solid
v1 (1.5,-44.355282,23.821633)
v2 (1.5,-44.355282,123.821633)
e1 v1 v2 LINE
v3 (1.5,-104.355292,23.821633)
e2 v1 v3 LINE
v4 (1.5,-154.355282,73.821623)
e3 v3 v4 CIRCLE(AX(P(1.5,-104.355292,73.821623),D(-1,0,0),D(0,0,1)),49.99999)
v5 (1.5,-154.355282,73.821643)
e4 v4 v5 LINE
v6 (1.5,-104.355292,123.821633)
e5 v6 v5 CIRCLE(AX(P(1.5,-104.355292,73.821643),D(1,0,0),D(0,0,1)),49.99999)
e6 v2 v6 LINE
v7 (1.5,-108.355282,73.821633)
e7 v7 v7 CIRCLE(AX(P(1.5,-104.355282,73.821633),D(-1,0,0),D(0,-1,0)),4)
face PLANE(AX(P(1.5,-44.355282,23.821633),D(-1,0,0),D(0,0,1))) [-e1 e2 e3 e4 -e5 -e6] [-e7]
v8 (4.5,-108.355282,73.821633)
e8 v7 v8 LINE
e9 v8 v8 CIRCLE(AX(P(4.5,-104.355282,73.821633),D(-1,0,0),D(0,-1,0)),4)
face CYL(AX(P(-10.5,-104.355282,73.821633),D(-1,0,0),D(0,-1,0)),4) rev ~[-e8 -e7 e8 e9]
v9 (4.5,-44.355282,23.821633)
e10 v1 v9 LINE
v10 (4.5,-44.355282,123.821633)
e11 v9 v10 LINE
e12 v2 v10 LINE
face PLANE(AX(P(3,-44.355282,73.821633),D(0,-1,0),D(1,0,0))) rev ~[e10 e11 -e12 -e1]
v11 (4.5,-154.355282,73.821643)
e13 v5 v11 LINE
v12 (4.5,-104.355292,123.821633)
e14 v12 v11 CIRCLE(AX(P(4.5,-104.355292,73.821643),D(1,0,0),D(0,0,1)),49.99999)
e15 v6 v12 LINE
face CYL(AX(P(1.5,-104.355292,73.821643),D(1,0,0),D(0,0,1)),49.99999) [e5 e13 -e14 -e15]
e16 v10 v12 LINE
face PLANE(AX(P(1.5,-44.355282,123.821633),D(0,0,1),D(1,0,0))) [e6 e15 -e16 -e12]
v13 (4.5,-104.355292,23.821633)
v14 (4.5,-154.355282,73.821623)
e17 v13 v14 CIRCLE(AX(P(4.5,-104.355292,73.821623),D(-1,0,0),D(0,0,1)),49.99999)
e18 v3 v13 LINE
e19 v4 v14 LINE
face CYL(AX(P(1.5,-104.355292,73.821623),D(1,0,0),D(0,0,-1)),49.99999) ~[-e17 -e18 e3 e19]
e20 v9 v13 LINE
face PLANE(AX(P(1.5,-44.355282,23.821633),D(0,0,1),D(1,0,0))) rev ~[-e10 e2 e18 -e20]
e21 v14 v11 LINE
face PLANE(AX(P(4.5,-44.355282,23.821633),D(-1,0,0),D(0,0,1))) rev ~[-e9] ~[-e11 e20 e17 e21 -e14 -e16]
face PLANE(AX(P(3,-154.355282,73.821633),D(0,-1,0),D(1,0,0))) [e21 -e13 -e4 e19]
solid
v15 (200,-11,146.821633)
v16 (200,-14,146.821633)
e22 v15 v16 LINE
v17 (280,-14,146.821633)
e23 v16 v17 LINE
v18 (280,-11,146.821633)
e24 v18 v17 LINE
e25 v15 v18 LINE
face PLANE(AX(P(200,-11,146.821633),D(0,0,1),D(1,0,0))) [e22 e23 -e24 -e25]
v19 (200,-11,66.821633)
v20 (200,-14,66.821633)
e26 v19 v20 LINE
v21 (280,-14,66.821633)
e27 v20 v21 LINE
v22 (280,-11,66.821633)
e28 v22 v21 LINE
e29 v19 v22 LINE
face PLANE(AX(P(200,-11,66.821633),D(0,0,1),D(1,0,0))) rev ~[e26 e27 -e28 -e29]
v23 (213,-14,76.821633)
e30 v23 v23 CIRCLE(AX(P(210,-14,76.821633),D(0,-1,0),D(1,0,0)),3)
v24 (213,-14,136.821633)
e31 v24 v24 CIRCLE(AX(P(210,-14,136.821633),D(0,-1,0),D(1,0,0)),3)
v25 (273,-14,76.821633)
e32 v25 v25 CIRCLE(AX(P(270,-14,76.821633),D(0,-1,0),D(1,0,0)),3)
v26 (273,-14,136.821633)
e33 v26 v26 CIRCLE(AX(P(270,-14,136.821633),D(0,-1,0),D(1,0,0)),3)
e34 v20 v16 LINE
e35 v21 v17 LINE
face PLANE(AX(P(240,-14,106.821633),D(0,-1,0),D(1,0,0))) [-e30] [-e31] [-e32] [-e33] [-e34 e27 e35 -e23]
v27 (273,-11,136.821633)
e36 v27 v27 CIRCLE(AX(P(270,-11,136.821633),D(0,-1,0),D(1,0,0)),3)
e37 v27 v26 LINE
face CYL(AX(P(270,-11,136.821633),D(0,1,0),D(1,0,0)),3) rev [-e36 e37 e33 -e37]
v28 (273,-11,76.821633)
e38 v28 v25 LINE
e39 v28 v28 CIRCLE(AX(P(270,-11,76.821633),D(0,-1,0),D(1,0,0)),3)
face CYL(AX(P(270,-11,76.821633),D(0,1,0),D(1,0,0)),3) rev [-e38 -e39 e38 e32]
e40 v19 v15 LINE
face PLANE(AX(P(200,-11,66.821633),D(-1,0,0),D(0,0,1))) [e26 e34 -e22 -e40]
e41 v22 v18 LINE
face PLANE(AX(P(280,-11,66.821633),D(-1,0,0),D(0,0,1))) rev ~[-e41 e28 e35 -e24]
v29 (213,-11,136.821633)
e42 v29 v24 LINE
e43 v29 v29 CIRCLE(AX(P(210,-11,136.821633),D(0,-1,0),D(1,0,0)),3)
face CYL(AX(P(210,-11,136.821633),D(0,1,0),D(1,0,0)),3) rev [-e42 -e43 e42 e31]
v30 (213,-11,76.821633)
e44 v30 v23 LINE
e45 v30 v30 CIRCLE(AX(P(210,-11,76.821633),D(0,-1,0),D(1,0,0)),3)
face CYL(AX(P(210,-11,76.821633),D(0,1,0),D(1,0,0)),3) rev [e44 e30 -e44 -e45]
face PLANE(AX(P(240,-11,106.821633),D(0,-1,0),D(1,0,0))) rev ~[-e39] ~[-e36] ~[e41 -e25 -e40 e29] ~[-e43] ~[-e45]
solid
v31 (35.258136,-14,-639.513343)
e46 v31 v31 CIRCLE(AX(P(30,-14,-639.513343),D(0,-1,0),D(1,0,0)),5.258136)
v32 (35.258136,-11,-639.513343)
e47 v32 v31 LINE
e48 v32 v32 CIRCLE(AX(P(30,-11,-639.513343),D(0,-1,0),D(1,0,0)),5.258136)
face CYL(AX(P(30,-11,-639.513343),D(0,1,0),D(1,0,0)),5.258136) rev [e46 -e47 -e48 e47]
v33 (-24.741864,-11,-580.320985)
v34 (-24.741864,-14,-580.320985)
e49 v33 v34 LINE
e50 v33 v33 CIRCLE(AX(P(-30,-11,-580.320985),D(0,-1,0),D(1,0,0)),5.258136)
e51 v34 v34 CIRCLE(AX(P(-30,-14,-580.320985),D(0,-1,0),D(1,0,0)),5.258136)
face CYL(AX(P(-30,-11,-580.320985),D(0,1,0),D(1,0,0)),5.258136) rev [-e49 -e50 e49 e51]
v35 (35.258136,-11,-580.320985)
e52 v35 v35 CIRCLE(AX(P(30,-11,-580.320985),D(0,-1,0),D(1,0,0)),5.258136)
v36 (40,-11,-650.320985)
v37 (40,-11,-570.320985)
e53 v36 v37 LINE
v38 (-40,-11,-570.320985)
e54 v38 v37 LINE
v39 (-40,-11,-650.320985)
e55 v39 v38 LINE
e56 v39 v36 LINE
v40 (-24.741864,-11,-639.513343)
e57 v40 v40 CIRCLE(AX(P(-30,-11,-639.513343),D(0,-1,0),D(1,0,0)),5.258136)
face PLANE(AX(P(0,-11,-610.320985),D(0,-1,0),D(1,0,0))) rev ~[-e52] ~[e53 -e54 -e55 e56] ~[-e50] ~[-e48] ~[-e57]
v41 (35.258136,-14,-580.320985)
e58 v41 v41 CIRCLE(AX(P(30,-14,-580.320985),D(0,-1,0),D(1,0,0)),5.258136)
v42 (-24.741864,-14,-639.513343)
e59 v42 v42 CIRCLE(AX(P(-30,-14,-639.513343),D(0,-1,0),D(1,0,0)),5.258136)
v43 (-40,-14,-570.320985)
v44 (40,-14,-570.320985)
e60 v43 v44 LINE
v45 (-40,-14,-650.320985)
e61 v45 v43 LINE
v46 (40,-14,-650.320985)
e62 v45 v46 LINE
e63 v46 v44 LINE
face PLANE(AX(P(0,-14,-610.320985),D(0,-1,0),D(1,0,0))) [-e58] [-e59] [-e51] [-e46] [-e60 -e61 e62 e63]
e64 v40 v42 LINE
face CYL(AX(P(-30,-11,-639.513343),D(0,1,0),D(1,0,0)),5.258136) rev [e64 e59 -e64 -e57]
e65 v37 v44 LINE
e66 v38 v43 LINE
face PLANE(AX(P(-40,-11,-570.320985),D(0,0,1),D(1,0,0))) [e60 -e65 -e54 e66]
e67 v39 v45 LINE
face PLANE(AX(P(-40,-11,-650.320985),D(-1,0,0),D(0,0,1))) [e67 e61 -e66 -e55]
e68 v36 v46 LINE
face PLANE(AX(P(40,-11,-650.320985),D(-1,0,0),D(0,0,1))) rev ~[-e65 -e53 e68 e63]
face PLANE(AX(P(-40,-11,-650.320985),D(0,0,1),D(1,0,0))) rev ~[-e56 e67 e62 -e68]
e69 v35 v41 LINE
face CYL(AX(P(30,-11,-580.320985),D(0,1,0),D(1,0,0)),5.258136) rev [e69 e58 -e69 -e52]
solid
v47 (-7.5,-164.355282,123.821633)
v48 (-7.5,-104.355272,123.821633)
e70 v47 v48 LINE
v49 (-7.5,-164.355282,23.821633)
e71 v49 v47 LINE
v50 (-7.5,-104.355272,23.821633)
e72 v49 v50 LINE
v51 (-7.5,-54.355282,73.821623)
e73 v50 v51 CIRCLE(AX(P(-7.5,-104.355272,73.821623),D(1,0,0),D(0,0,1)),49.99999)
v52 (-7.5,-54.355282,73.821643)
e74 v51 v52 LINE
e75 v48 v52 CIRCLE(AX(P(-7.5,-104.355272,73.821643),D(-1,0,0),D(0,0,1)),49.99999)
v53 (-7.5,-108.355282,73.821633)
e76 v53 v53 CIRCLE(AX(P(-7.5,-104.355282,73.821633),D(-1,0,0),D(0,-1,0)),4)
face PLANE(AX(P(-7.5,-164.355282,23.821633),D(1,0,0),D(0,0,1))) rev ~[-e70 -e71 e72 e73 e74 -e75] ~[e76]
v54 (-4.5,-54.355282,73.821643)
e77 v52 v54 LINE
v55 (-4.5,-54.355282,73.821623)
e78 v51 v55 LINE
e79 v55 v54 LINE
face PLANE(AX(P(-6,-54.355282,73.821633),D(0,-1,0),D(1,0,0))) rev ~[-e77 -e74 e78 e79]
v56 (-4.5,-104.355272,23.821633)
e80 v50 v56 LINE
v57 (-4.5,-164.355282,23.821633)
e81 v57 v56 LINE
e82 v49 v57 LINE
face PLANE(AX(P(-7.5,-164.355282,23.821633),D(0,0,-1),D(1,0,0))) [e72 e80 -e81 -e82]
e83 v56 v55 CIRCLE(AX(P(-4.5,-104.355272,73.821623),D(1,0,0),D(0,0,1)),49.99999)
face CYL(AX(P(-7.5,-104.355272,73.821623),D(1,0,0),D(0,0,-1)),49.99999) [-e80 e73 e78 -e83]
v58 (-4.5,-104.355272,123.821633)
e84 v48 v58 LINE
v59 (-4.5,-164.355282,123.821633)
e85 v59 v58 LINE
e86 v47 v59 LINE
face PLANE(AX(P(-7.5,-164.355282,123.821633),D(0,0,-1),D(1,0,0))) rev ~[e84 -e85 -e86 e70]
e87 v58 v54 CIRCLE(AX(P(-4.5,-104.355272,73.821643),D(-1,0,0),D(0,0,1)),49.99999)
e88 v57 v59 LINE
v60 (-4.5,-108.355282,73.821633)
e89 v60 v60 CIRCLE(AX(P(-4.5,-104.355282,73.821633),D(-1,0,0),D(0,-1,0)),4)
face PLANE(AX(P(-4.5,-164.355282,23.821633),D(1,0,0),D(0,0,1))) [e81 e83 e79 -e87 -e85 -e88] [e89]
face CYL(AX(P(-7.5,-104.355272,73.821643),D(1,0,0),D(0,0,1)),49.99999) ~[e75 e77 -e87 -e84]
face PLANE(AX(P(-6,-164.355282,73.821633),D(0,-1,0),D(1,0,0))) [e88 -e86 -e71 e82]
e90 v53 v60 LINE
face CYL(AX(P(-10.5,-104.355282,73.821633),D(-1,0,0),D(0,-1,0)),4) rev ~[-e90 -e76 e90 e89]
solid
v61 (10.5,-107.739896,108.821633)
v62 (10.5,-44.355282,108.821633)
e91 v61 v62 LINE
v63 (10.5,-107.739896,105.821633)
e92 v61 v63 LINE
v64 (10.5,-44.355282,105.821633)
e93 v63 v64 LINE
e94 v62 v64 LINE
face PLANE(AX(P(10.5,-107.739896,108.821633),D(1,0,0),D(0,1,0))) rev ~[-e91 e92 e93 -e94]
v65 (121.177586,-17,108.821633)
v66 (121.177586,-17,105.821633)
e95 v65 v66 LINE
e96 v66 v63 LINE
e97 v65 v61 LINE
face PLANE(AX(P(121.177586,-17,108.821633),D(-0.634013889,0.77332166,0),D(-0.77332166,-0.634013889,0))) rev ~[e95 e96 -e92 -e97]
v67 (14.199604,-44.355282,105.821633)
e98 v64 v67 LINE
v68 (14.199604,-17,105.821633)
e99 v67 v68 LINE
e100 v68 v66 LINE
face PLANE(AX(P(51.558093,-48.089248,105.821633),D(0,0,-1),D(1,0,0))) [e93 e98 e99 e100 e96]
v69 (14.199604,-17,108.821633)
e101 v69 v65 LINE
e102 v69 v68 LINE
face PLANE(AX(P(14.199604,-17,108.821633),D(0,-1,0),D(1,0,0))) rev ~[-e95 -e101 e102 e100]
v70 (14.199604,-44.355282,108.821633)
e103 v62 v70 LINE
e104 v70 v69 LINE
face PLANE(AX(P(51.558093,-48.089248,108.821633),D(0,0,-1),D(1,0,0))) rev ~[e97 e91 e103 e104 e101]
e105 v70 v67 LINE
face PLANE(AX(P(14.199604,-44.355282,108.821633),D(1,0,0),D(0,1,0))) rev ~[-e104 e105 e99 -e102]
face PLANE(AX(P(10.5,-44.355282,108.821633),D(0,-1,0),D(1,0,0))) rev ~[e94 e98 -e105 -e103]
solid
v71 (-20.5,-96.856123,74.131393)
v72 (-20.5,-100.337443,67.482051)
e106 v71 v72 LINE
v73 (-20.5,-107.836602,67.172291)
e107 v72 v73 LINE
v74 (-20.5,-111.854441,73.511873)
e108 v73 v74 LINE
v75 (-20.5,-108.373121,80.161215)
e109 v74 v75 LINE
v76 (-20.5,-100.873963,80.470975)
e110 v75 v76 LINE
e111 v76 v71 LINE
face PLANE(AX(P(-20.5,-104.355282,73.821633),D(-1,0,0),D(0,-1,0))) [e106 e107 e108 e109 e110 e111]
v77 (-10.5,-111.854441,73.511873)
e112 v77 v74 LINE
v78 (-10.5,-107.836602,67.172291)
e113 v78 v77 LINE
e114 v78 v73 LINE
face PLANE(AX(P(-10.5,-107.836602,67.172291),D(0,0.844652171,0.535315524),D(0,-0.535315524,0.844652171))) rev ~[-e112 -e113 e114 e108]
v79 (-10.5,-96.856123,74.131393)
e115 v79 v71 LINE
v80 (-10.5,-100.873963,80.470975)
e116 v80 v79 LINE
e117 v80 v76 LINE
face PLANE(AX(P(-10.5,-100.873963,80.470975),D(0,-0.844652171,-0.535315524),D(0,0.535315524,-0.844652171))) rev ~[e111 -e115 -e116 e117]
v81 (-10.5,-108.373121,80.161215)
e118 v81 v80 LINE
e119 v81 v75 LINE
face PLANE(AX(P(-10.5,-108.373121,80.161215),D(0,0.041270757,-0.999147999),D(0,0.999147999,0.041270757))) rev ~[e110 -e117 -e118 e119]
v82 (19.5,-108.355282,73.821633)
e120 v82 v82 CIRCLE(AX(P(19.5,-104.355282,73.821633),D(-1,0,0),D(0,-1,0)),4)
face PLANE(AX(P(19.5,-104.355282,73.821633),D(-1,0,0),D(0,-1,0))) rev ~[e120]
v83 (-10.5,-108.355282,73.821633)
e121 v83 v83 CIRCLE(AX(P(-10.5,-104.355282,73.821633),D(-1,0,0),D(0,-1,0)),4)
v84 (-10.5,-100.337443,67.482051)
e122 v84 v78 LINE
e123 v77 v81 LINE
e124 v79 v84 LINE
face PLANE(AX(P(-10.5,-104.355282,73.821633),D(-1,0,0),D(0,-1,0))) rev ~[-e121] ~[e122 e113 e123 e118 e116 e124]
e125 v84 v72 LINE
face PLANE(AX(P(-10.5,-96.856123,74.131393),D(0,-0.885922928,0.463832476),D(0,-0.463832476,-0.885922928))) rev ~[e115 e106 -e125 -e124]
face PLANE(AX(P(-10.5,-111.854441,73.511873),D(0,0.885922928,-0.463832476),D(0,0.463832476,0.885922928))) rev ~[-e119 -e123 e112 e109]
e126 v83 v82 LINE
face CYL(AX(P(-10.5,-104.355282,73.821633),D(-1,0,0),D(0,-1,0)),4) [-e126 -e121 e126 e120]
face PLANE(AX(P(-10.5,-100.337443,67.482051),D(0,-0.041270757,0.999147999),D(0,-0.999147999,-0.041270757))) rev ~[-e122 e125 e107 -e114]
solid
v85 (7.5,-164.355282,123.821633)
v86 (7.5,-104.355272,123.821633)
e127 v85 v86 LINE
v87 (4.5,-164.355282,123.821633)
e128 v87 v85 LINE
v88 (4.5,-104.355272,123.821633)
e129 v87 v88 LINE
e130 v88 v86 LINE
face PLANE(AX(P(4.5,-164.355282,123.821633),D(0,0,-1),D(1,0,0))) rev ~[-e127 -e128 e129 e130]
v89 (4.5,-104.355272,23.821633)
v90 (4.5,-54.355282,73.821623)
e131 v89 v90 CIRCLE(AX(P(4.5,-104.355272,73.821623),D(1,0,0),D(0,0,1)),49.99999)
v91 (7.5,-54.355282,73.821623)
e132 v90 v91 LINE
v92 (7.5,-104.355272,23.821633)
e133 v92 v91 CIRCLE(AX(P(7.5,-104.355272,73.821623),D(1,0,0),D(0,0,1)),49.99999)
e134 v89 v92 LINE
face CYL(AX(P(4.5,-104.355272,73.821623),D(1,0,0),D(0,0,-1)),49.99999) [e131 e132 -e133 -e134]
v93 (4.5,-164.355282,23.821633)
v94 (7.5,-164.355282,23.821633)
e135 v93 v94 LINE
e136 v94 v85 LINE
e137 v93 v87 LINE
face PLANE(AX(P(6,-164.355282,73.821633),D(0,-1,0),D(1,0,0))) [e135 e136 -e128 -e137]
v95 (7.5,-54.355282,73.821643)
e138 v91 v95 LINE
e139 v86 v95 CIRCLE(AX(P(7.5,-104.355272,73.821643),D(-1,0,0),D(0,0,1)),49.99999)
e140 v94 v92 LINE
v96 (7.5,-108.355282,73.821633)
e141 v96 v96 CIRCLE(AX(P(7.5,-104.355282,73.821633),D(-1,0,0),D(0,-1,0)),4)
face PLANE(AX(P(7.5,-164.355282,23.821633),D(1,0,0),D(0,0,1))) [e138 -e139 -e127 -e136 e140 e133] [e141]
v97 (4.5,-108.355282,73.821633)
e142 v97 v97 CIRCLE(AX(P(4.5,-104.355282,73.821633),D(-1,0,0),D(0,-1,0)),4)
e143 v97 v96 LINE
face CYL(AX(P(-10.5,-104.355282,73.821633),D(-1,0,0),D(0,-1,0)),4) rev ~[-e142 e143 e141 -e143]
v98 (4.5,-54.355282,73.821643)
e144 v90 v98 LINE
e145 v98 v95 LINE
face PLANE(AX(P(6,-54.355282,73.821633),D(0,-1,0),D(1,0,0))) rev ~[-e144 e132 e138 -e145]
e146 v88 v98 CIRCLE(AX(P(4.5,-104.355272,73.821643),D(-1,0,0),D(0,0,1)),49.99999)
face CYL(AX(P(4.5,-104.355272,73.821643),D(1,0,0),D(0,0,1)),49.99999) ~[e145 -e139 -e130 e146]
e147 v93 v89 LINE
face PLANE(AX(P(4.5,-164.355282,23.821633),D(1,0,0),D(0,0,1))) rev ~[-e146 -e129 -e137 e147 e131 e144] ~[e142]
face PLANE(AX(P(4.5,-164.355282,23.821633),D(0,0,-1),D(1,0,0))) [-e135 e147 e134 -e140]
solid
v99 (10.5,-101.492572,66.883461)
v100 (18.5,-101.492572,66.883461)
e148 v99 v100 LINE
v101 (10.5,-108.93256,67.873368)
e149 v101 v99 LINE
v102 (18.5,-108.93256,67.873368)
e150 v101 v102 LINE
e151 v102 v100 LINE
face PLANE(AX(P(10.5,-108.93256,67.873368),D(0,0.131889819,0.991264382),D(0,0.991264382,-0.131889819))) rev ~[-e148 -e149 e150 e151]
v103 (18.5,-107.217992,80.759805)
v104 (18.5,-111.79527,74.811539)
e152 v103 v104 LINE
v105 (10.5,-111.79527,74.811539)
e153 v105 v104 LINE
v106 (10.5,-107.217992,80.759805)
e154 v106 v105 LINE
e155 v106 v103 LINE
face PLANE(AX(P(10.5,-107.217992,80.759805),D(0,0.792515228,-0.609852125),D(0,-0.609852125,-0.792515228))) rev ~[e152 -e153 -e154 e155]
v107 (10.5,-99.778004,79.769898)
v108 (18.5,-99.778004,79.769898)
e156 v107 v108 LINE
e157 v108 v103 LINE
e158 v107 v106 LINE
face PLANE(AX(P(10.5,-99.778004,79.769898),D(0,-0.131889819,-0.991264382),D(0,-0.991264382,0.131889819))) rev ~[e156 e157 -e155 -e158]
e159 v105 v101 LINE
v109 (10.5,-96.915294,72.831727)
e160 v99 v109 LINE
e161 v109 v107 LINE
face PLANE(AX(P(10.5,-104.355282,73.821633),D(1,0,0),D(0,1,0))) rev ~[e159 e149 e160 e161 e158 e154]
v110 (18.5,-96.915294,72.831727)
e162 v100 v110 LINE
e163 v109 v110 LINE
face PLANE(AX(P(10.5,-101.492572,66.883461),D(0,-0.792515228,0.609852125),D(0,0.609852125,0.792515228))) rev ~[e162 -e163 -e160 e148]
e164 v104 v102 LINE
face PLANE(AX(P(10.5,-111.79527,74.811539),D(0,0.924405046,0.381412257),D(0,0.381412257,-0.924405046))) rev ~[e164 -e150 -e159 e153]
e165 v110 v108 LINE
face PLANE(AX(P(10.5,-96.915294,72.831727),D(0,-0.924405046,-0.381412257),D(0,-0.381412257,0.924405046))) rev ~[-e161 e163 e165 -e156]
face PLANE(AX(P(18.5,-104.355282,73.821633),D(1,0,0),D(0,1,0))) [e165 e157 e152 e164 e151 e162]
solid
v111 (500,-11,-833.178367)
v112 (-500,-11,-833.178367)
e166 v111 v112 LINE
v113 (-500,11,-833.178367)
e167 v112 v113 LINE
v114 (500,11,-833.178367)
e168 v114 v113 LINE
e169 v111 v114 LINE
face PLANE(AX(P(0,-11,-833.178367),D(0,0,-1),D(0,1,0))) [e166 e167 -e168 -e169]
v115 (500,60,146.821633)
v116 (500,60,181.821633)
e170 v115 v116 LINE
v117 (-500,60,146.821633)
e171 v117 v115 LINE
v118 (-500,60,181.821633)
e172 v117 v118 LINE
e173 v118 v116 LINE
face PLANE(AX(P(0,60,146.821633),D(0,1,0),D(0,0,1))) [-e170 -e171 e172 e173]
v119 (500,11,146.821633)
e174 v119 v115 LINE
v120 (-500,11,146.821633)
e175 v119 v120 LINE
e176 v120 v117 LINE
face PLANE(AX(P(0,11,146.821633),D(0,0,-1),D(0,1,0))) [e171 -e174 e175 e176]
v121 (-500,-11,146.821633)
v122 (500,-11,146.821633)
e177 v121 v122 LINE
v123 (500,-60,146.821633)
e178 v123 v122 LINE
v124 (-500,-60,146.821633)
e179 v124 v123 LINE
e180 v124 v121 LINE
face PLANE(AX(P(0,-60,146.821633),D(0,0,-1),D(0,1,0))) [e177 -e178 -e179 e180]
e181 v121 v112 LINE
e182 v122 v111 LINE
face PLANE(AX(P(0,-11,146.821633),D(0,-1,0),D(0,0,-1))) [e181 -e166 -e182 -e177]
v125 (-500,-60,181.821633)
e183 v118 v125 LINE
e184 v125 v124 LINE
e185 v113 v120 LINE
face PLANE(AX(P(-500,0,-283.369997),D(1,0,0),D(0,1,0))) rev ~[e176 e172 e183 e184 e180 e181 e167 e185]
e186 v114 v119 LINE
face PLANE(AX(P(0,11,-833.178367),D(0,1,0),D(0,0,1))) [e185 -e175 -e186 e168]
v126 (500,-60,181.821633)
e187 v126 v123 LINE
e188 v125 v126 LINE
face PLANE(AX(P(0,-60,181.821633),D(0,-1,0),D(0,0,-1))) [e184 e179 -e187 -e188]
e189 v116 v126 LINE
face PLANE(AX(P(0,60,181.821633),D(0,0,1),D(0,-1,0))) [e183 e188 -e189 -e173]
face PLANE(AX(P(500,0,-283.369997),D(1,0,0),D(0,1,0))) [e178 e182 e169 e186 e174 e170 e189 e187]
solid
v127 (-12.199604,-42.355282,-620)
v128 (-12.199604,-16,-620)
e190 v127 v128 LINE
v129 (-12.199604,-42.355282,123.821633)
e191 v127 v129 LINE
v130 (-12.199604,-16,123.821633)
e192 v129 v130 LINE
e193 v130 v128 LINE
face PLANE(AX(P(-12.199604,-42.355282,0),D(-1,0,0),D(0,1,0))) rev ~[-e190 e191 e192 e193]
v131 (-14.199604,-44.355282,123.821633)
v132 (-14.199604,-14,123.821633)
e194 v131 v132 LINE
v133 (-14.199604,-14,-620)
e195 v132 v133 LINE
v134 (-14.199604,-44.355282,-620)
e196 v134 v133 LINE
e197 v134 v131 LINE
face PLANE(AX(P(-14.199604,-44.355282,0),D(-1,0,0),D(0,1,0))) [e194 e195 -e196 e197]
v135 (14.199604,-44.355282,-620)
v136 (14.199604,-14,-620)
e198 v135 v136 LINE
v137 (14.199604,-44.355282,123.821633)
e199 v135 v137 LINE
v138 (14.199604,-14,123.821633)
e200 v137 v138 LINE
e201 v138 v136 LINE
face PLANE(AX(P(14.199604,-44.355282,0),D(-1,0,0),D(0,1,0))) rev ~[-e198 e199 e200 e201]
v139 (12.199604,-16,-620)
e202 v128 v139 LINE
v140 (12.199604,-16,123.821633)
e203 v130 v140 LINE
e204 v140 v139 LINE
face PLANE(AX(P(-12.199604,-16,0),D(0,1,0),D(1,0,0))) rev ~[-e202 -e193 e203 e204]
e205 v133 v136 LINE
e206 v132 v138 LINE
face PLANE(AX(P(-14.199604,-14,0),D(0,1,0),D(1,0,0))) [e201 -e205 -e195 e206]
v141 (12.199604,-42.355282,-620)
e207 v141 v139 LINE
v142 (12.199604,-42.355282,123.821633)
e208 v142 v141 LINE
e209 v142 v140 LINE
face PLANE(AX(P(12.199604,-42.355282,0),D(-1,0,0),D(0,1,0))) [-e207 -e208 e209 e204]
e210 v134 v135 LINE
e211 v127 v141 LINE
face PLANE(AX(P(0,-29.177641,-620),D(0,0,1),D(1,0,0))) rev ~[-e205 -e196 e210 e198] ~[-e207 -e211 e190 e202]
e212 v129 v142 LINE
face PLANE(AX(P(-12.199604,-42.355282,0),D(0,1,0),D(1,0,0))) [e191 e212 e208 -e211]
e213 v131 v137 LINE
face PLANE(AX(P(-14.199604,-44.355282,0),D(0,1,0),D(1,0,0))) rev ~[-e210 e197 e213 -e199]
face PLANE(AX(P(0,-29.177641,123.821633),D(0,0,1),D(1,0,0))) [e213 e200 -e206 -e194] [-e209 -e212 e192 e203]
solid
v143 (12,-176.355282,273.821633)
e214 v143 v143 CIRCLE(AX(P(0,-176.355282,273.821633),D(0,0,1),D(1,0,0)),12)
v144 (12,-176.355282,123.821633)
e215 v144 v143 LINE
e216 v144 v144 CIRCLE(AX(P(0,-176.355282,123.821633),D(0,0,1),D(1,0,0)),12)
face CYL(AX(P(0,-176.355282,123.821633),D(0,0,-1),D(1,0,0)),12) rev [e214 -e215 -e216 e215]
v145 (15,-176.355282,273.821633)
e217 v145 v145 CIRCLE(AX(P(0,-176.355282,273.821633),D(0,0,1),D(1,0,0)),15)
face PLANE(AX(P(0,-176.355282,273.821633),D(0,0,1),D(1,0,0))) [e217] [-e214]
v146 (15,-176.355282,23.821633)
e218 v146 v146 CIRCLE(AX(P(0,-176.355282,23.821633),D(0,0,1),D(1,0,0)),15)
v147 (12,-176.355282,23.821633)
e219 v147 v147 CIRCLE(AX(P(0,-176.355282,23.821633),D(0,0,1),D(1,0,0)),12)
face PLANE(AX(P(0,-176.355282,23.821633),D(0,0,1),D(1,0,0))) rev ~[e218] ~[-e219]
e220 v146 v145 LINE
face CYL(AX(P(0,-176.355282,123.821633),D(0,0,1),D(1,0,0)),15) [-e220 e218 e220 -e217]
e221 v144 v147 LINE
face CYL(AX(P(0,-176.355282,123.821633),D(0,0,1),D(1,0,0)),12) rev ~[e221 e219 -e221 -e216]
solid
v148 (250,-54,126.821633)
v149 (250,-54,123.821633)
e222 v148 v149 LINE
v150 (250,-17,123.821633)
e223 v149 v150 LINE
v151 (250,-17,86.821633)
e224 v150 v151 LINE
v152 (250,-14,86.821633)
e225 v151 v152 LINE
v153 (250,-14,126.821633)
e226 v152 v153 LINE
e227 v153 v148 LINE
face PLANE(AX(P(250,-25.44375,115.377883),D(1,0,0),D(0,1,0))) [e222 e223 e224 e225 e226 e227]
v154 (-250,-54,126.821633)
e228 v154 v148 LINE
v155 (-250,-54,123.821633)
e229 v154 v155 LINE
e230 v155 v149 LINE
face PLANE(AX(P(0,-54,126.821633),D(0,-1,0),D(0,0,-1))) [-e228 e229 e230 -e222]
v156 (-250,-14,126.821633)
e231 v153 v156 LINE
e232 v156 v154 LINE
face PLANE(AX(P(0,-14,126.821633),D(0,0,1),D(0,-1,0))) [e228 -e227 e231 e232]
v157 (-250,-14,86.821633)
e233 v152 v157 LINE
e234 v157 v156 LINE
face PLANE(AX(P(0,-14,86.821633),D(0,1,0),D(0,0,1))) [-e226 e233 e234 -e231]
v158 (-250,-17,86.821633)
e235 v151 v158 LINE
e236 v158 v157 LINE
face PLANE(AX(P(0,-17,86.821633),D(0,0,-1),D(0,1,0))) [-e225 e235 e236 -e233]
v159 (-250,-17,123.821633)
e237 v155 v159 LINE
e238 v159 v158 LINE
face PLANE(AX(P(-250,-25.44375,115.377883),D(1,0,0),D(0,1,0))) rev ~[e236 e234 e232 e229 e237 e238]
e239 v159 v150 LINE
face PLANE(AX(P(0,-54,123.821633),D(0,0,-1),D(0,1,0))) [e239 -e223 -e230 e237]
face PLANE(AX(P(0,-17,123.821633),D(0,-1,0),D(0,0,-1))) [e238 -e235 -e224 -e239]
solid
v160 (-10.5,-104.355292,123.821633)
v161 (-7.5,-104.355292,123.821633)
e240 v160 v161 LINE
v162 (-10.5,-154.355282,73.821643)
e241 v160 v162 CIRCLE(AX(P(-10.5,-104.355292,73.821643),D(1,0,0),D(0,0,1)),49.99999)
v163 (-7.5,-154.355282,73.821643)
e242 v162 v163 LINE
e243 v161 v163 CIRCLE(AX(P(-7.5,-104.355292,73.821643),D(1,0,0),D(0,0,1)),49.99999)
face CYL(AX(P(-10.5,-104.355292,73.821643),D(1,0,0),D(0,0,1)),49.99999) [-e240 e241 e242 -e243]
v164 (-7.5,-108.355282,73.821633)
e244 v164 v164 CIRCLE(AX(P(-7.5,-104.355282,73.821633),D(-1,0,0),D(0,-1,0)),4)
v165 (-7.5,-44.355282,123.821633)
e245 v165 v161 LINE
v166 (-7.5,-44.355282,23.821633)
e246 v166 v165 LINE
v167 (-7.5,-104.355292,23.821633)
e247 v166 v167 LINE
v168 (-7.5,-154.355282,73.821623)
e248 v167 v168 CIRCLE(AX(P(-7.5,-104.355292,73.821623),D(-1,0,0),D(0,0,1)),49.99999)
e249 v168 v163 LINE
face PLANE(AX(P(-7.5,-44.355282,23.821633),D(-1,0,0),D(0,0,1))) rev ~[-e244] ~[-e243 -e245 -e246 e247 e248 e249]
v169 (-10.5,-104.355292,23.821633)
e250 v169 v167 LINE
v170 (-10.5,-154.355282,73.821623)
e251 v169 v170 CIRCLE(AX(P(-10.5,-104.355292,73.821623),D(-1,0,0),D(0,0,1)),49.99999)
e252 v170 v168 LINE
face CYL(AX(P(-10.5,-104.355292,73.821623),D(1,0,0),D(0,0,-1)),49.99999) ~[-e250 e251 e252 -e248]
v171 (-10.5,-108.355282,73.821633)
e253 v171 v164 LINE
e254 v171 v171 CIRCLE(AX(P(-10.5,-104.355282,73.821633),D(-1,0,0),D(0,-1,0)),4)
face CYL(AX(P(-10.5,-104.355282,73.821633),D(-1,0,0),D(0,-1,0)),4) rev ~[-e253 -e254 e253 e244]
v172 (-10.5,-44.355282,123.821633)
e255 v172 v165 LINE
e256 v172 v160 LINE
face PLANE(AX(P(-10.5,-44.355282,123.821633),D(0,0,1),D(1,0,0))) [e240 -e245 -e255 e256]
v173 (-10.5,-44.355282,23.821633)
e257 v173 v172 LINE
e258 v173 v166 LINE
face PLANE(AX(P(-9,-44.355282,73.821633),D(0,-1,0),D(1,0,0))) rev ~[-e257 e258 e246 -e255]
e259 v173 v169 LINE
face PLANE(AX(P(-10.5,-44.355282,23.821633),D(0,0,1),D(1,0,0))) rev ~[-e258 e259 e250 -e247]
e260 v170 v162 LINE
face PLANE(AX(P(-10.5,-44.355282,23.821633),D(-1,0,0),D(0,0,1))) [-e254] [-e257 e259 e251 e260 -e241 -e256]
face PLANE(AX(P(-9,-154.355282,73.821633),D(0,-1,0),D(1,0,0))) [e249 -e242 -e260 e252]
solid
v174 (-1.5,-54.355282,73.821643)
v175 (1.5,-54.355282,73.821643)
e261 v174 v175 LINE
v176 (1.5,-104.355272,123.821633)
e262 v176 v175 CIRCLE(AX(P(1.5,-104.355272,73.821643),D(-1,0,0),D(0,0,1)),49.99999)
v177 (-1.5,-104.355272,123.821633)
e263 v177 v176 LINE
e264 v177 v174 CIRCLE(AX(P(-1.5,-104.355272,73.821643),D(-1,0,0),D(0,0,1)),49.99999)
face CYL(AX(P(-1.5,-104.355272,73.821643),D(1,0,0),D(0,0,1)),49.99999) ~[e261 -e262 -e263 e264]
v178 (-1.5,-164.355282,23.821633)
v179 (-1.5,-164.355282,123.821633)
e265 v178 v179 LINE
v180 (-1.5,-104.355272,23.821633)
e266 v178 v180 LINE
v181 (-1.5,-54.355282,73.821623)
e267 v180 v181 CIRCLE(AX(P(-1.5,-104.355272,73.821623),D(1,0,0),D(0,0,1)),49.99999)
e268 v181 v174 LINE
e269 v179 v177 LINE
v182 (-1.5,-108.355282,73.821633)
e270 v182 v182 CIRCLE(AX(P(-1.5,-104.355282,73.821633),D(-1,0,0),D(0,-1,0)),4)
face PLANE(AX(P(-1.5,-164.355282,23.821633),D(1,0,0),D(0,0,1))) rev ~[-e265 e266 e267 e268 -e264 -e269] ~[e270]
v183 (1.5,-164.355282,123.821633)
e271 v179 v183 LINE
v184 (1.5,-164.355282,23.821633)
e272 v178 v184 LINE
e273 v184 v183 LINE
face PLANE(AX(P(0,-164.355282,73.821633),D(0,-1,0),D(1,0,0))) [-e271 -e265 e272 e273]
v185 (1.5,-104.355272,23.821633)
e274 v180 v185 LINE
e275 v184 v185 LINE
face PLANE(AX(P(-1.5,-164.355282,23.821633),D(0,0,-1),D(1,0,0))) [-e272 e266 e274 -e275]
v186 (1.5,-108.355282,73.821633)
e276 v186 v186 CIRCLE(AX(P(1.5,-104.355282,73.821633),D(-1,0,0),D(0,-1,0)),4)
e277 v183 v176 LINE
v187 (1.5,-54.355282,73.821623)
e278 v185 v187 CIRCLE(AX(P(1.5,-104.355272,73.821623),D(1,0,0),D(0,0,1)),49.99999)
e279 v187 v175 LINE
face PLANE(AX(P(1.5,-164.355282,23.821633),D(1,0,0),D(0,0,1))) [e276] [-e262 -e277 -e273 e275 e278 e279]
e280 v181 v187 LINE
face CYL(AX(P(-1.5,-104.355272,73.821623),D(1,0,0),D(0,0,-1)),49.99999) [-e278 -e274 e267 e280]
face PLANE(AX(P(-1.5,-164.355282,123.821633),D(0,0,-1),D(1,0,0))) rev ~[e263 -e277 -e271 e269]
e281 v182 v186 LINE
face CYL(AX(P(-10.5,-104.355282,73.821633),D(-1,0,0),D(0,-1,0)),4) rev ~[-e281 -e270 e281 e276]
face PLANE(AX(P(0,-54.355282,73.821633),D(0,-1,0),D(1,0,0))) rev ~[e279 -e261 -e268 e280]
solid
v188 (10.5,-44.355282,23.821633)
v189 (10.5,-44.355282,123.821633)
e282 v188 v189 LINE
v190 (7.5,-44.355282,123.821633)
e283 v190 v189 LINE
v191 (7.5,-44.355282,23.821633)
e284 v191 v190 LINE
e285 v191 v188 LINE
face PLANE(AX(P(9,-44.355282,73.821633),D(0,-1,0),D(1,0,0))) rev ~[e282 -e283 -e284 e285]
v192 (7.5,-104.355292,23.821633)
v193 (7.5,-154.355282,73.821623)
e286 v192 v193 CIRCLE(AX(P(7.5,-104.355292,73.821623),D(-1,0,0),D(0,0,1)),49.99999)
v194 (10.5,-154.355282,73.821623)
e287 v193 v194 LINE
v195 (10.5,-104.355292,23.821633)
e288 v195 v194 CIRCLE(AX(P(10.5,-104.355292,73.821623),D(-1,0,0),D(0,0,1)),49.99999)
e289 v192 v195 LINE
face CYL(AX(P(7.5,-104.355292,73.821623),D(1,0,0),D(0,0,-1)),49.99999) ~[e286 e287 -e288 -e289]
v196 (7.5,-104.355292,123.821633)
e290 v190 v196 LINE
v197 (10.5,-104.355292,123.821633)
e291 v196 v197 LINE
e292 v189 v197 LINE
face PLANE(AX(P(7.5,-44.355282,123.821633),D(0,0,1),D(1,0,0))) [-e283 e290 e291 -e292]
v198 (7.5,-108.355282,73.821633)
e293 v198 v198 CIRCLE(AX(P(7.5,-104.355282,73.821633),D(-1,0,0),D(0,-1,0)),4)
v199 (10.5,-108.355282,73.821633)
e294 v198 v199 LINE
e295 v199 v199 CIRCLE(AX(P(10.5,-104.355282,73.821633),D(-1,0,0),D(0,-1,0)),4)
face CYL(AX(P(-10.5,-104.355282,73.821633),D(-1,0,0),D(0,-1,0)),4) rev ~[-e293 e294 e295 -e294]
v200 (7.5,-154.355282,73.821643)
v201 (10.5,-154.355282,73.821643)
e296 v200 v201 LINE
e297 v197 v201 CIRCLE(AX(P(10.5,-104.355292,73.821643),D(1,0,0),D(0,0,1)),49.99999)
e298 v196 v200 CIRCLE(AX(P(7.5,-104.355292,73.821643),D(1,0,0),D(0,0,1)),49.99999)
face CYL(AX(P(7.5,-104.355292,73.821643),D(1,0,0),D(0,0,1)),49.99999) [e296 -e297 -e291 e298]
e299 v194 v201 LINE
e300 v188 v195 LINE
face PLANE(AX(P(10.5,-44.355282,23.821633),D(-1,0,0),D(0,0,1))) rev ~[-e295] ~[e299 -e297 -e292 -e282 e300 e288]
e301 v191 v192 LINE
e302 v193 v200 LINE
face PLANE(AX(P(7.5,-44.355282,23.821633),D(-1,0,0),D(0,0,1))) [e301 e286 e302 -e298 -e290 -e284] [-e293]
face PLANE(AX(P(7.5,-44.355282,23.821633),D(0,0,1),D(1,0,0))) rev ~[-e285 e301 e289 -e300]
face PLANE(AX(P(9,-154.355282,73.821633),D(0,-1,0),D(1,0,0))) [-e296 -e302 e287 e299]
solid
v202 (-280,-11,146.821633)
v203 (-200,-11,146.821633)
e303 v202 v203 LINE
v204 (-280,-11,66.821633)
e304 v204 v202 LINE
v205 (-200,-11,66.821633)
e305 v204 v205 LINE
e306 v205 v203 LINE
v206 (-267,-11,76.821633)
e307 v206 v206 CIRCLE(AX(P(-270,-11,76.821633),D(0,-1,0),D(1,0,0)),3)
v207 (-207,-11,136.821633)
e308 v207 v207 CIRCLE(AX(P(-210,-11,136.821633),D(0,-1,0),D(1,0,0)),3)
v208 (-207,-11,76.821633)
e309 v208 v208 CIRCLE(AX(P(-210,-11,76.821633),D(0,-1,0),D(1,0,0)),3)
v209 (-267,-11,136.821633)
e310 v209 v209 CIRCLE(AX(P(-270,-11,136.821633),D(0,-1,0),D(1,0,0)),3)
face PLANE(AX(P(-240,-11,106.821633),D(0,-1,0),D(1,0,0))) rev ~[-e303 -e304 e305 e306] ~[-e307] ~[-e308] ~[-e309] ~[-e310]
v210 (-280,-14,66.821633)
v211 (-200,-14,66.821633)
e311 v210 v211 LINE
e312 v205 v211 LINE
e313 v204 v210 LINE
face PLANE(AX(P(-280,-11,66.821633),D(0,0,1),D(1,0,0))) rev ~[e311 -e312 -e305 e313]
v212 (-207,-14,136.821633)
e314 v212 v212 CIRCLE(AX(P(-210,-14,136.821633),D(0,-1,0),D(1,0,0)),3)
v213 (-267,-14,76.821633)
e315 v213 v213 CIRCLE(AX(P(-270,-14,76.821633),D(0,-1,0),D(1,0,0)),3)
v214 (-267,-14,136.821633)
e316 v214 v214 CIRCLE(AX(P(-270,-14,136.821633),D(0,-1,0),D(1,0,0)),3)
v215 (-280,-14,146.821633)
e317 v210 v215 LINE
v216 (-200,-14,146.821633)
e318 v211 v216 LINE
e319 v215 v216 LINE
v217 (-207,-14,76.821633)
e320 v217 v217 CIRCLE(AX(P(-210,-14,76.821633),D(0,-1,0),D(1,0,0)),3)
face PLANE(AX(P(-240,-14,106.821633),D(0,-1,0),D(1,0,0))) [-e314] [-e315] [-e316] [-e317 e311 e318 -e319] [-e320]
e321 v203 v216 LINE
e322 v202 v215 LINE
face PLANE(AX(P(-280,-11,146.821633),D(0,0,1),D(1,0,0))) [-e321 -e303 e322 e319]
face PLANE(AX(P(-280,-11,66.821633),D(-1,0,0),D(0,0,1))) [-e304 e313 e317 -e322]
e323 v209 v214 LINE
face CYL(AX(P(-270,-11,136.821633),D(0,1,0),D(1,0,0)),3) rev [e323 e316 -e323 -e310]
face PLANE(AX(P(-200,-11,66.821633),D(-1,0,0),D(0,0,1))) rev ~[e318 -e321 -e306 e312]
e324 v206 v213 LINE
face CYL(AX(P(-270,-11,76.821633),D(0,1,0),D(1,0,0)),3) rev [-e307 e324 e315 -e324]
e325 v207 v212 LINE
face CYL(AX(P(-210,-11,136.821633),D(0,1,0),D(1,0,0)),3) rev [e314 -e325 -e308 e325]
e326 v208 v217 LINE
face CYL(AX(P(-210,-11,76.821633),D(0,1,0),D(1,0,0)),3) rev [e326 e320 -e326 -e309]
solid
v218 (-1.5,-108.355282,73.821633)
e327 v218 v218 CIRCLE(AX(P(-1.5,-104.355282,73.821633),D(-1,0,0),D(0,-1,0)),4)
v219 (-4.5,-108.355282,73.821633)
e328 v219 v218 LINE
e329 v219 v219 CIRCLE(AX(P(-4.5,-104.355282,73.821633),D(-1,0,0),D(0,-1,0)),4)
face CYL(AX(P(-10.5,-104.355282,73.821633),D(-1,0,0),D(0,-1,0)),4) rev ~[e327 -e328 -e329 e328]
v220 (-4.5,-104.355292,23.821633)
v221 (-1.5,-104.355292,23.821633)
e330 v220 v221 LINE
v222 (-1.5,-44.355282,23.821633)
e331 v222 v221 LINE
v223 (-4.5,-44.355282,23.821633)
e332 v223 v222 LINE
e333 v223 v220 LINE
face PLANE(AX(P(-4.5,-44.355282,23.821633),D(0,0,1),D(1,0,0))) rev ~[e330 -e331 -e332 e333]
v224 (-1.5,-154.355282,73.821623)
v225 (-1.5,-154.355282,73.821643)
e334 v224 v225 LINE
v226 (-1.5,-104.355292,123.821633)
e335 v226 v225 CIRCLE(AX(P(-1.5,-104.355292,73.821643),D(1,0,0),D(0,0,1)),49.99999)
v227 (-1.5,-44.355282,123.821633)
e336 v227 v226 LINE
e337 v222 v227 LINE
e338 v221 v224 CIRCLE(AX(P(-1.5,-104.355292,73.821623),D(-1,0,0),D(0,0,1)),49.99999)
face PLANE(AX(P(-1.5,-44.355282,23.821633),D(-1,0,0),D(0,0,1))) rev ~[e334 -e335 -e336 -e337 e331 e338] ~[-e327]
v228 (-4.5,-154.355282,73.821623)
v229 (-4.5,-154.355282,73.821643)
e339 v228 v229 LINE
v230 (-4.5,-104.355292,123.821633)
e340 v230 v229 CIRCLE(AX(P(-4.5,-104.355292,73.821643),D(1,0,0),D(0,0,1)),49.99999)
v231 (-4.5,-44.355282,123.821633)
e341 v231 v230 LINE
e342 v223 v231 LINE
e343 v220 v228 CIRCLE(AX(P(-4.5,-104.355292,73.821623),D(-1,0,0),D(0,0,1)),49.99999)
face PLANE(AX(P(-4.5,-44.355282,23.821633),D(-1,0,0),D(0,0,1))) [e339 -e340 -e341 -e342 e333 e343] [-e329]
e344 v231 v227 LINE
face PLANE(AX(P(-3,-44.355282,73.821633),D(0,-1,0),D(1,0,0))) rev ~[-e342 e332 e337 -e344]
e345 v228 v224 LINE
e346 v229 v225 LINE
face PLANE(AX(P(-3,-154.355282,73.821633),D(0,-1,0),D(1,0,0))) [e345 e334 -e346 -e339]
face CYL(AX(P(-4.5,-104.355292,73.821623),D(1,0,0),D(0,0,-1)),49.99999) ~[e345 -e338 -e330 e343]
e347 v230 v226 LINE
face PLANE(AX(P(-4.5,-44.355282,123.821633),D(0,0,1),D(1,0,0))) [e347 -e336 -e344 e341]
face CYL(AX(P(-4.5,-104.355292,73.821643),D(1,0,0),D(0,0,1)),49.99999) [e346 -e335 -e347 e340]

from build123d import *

# Parameters (mm, degrees)
F2_DEPTH       = 500
F3_W           = 80
F3_H           = 80
F3_R           = 3
F4_DEPTH       = 3
F3_R_2         = 5.2581355903
F6_DEPTH       = 250
F7_W           = 28.3992085606
F7_H           = 30.3552821279
F7_W_2         = 24.3992085606
F7_H_2         = 26.3552821279
F8_DEPTH       = 620
F8_DEPTH_BACK  = 123.8216329813
F9_W           = 3
F9_H           = 100
F10_DEPTH      = 110
F11_R          = 49.99999
F11_2_R        = 49.99999
F11_3_R        = 49.99999
F11_4_R        = 49.99999
F13_W          = 3
F13_H          = 100
F14_DEPTH      = 110
F15_R          = 49.99999
F15_2_R        = 49.99999
F15_3_R        = 49.99999
F16_R          = 4
F17_DEPTH      = 21
F18_R          = 15
F18_R_2        = 12
F19_DEPTH      = 150
F19_DEPTH_BACK = 100
F20_R          = 4
F21_DEPTH      = 30
F23_DEPTH      = 10
F25_DEPTH      = 8
F28_DEPTH      = 3


# Not quite as in the source:
# - a fillet or chamfer is up to 0.001 mm smaller than in the source, because OpenCascade refuses the exact size


with BuildPart() as f2:
    # F1 (on Right) → F2 (new body, symmetric)
    with BuildSketch(Plane.YZ):
        Polygon((11, 146.8216329813), (60, 146.8216329813), (60, 181.8216329813), (-60, 181.8216329813), (-60, 146.8216329813), (-11, 146.8216329813), (-11, -833.1783670187), (11, -833.1783670187), align=None)
    extrude(amount=F2_DEPTH, both=True)


with BuildPart() as f4:
    # F3 (on face) → F4 (new body)
    with BuildSketch(Plane.XZ.offset(11)):
        with Locations((-240, 106.8216329813)):
            Rectangle(F3_W, F3_H)
        with Locations((-270, 76.8216329813)):
            Circle(F3_R, mode=Mode.SUBTRACT)
        with Locations((-270, 136.8216329813)):
            Circle(F3_R, mode=Mode.SUBTRACT)
        with Locations((-210, 76.8216329813)):
            Circle(F3_R, mode=Mode.SUBTRACT)
        with Locations((-210, 136.8216329813)):
            Circle(F3_R, mode=Mode.SUBTRACT)
    extrude(amount=F4_DEPTH)


with BuildPart() as f4b:
    # F3 (on face) → F4, piece 2 (new body)
    with BuildSketch(Plane.XZ.offset(11)):
        with Locations((240, 106.8216329813)):
            Rectangle(F3_W, F3_H)
        with Locations((210, 76.8216329813)):
            Circle(F3_R, mode=Mode.SUBTRACT)
        with Locations((270, 76.8216329813)):
            Circle(F3_R, mode=Mode.SUBTRACT)
        with Locations((210, 136.8216329813)):
            Circle(F3_R, mode=Mode.SUBTRACT)
        with Locations((270, 136.8216329813)):
            Circle(F3_R, mode=Mode.SUBTRACT)
    extrude(amount=F4_DEPTH)


with BuildPart() as f4c:
    # F3 (on face) → F4, piece 3 (new body)
    with BuildSketch(Plane.XZ.offset(11)):
        with Locations((0, -610.3209847212)):
            Rectangle(F3_W, F3_H)
        with Locations((-30, -639.5133429766)):
            Circle(F3_R_2, mode=Mode.SUBTRACT)
        with Locations((-30, -580.3209847212)):
            Circle(F3_R_2, mode=Mode.SUBTRACT)
        with Locations((30, -639.5133429766)):
            Circle(F3_R_2, mode=Mode.SUBTRACT)
        with Locations((30, -580.3209847212)):
            Circle(F3_R_2, mode=Mode.SUBTRACT)
    extrude(amount=F4_DEPTH)


with BuildPart() as f6:
    # F5 (on Right) → F6 (new body, symmetric)
    with BuildSketch(Plane.YZ):
        Polygon((-14, 126.8216329813), (-54, 126.8216329813), (-54, 123.8216329813), (-17, 123.8216329813), (-17, 86.8216329813), (-14, 86.8216329813), align=None)
    extrude(amount=F6_DEPTH, both=True)


with BuildPart() as f8:
    # F7 (on Top) → F8 (new body, two sides)
    with BuildSketch(Plane.XY) as f8_sk:
        with Locations((0, -29.1776410639)):
            Rectangle(F7_W, F7_H)
        with Locations((0, -29.1776410639)):
            Rectangle(F7_W_2, F7_H_2, mode=Mode.SUBTRACT)
    extrude(amount=-F8_DEPTH)
    extrude(f8_sk.sketch, amount=F8_DEPTH_BACK)


with BuildPart() as f10:
    # F9 (on face) → F10 (new body)
    with BuildSketch(Plane.XZ.offset(44.3552821279)):
        with Locations((-3, 73.8216329813)):
            Rectangle(F9_W, F9_H)
    extrude(amount=F10_DEPTH)

    # F11 (radius 50 in the source; OpenCascade refuses exactly that, so slightly less here)
    f11_edges = [f10.edges().sort_by_distance(p)[0] for p in [
        (-3, -154.355282, 23.821633),
        (-3, -154.355282, 123.821633),
    ]]
    fillet(f11_edges, radius=F11_R)


with BuildPart() as f10b:
    # F9 (on face) → F10, piece 2 (new body)
    with BuildSketch(Plane.XZ.offset(44.3552821279)):
        with Locations((-9, 73.8216329813)):
            Rectangle(F9_W, F9_H)
    extrude(amount=F10_DEPTH)

    # F11#2 (radius 50 in the source; OpenCascade refuses exactly that, so slightly less here)
    f11_2_edges = [f10b.edges().sort_by_distance(p)[0] for p in [
        (-9, -154.355282, 23.821633),
        (-9, -154.355282, 123.821633),
    ]]
    fillet(f11_2_edges, radius=F11_2_R)


with BuildPart() as f10c:
    # F9 (on face) → F10, piece 3 (new body)
    with BuildSketch(Plane.XZ.offset(44.3552821279)):
        with Locations((3, 73.8216329813)):
            Rectangle(F9_W, F9_H)
    extrude(amount=F10_DEPTH)

    # F11#3 (radius 50 in the source; OpenCascade refuses exactly that, so slightly less here)
    f11_3_edges = [f10c.edges().sort_by_distance(p)[0] for p in [
        (3, -154.355282, 23.821633),
        (3, -154.355282, 123.821633),
    ]]
    fillet(f11_3_edges, radius=F11_3_R)


with BuildPart() as f10d:
    # F9 (on face) → F10, piece 4 (new body)
    with BuildSketch(Plane.XZ.offset(44.3552821279)):
        with Locations((9, 73.8216329813)):
            Rectangle(F9_W, F9_H)
    extrude(amount=F10_DEPTH)

    # F11#4 (radius 50 in the source; OpenCascade refuses exactly that, so slightly less here)
    f11_4_edges = [f10d.edges().sort_by_distance(p)[0] for p in [
        (9, -154.355282, 23.821633),
        (9, -154.355282, 123.821633),
    ]]
    fillet(f11_4_edges, radius=F11_4_R)


with BuildPart() as f14:
    # F13 (on offset) → F14 (new body)
    with BuildSketch(Plane.XZ.offset(164.3552821279)):
        with Locations((-6, 73.8216329813)):
            Rectangle(F13_W, F13_H)
    extrude(amount=-F14_DEPTH)

    # F15 (radius 50 in the source; OpenCascade refuses exactly that, so slightly less here)
    f15_edges = [f14.edges().sort_by_distance(p)[0] for p in [
        (-6, -54.355282, 123.821633),
        (-6, -54.355282, 23.821633),
    ]]
    fillet(f15_edges, radius=F15_R)


with BuildPart() as f14b:
    # F13 (on offset) → F14, piece 2 (new body)
    with BuildSketch(Plane.XZ.offset(164.3552821279)):
        with Locations((0, 73.8216329813)):
            Rectangle(F13_W, F13_H)
    extrude(amount=-F14_DEPTH)

    # F15#2 (radius 50 in the source; OpenCascade refuses exactly that, so slightly less here)
    f15_2_edges = [f14b.edges().sort_by_distance(p)[0] for p in [
        (0, -54.355282, 123.821633),
        (0, -54.355282, 23.821633),
    ]]
    fillet(f15_2_edges, radius=F15_2_R)


with BuildPart() as f14c:
    # F13 (on offset) → F14, piece 3 (new body)
    with BuildSketch(Plane.XZ.offset(164.3552821279)):
        with Locations((6, 73.8216329813)):
            Rectangle(F13_W, F13_H)
    extrude(amount=-F14_DEPTH)

    # F15#3 (radius 50 in the source; OpenCascade refuses exactly that, so slightly less here)
    f15_3_edges = [f14c.edges().sort_by_distance(p)[0] for p in [
        (6, -54.355282, 123.821633),
        (6, -54.355282, 23.821633),
    ]]
    fillet(f15_3_edges, radius=F15_3_R)


with BuildPart() as f17_tool:
    # F16 (on face) → F17 (new body, through all)
    with BuildSketch(Plane(origin=(-10.5, 0, 0), x_dir=(0, -1, 0), z_dir=(-1, 0, 0))):
        with Locations((104.3552821279, 73.8216329813)):
            Circle(F16_R)
    extrude(amount=-F17_DEPTH)


with BuildPart() as f10_1:
    add(f10.part)

    # F17: cut by f17_tool
    add(f17_tool.part, mode=Mode.SUBTRACT)


with BuildPart() as f10b_1:
    add(f10b.part)

    # F17: cut by f17_tool
    add(f17_tool.part, mode=Mode.SUBTRACT)


with BuildPart() as f10c_1:
    add(f10c.part)

    # F17: cut by f17_tool
    add(f17_tool.part, mode=Mode.SUBTRACT)


with BuildPart() as f10d_1:
    add(f10d.part)

    # F17: cut by f17_tool
    add(f17_tool.part, mode=Mode.SUBTRACT)


with BuildPart() as f14_1:
    add(f14.part)

    # F17: cut by f17_tool
    add(f17_tool.part, mode=Mode.SUBTRACT)


with BuildPart() as f14b_1:
    add(f14b.part)

    # F17: cut by f17_tool
    add(f17_tool.part, mode=Mode.SUBTRACT)


with BuildPart() as f14c_1:
    add(f14c.part)

    # F17: cut by f17_tool
    add(f17_tool.part, mode=Mode.SUBTRACT)


with BuildPart() as f19:
    # F18 (on face) → F19 (new body, two sides)
    with BuildSketch(Plane.XY.offset(123.8216329813)) as f19_sk:
        with Locations((0, -176.3552821279)):
            Circle(F18_R)
        with Locations((0, -176.3552821279)):
            Circle(F18_R_2, mode=Mode.SUBTRACT)
    extrude(amount=F19_DEPTH)
    extrude(f19_sk.sketch, amount=-F19_DEPTH_BACK)


with BuildPart() as f21:
    # F20 (on face) → F21 (new body)
    with BuildSketch(Plane(origin=(-10.5, 0, 0), x_dir=(0, -1, 0), z_dir=(-1, 0, 0))):
        with Locations((104.3552821279, 73.8216329813)):
            Circle(F20_R)
    extrude(amount=-F21_DEPTH)

    # F22 (on face) → F23 (join)
    with BuildSketch(Plane(origin=(-10.5, 0, 0), x_dir=(0, -1, 0), z_dir=(-1, 0, 0))):
        Polygon((107.8366015876, 67.1722910475), (111.8544408908, 73.5118731053), (108.3731214311, 80.161215039), (100.8739626681, 80.4709749151), (96.8561233649, 74.1313928573), (100.3374428246, 67.4820509236), align=None)
    extrude(amount=F23_DEPTH)


with BuildPart() as f25:
    # F24 (on face) → F25 (new body)
    with BuildSketch(Plane.YZ.offset(10.5)):
        Polygon((-101.4925720239, 66.8834614503), (-96.9152942742, 72.8317268895), (-99.7780043781, 79.7698984206), (-107.2179922318, 80.7598045124), (-111.7952699815, 74.8115390732), (-108.9325598776, 67.8733675421), align=None)
    extrude(amount=F25_DEPTH)


with BuildPart() as f28:
    # F27 (on offset) → F28 (new body)
    with BuildSketch(Plane(origin=(0, 0, 108.8216329813), x_dir=(1, 0, 0), z_dir=(0, 0, -1))):
        Polygon((121.1775859371, 17), (10.5, 107.7398955822), (10.5, 44.3552821279), (14.1996042803, 44.3552821279), (14.1996042803, 17), align=None)
    extrude(amount=F28_DEPTH)


solid = Compound([f2.part, f4.part, f4b.part, f4c.part, f6.part, f8.part, f10_1.part, f10b_1.part, f10c_1.part, f10d_1.part, f14_1.part, f14b_1.part, f14c_1.part, f19.part, f21.part, f25.part, f28.part])
